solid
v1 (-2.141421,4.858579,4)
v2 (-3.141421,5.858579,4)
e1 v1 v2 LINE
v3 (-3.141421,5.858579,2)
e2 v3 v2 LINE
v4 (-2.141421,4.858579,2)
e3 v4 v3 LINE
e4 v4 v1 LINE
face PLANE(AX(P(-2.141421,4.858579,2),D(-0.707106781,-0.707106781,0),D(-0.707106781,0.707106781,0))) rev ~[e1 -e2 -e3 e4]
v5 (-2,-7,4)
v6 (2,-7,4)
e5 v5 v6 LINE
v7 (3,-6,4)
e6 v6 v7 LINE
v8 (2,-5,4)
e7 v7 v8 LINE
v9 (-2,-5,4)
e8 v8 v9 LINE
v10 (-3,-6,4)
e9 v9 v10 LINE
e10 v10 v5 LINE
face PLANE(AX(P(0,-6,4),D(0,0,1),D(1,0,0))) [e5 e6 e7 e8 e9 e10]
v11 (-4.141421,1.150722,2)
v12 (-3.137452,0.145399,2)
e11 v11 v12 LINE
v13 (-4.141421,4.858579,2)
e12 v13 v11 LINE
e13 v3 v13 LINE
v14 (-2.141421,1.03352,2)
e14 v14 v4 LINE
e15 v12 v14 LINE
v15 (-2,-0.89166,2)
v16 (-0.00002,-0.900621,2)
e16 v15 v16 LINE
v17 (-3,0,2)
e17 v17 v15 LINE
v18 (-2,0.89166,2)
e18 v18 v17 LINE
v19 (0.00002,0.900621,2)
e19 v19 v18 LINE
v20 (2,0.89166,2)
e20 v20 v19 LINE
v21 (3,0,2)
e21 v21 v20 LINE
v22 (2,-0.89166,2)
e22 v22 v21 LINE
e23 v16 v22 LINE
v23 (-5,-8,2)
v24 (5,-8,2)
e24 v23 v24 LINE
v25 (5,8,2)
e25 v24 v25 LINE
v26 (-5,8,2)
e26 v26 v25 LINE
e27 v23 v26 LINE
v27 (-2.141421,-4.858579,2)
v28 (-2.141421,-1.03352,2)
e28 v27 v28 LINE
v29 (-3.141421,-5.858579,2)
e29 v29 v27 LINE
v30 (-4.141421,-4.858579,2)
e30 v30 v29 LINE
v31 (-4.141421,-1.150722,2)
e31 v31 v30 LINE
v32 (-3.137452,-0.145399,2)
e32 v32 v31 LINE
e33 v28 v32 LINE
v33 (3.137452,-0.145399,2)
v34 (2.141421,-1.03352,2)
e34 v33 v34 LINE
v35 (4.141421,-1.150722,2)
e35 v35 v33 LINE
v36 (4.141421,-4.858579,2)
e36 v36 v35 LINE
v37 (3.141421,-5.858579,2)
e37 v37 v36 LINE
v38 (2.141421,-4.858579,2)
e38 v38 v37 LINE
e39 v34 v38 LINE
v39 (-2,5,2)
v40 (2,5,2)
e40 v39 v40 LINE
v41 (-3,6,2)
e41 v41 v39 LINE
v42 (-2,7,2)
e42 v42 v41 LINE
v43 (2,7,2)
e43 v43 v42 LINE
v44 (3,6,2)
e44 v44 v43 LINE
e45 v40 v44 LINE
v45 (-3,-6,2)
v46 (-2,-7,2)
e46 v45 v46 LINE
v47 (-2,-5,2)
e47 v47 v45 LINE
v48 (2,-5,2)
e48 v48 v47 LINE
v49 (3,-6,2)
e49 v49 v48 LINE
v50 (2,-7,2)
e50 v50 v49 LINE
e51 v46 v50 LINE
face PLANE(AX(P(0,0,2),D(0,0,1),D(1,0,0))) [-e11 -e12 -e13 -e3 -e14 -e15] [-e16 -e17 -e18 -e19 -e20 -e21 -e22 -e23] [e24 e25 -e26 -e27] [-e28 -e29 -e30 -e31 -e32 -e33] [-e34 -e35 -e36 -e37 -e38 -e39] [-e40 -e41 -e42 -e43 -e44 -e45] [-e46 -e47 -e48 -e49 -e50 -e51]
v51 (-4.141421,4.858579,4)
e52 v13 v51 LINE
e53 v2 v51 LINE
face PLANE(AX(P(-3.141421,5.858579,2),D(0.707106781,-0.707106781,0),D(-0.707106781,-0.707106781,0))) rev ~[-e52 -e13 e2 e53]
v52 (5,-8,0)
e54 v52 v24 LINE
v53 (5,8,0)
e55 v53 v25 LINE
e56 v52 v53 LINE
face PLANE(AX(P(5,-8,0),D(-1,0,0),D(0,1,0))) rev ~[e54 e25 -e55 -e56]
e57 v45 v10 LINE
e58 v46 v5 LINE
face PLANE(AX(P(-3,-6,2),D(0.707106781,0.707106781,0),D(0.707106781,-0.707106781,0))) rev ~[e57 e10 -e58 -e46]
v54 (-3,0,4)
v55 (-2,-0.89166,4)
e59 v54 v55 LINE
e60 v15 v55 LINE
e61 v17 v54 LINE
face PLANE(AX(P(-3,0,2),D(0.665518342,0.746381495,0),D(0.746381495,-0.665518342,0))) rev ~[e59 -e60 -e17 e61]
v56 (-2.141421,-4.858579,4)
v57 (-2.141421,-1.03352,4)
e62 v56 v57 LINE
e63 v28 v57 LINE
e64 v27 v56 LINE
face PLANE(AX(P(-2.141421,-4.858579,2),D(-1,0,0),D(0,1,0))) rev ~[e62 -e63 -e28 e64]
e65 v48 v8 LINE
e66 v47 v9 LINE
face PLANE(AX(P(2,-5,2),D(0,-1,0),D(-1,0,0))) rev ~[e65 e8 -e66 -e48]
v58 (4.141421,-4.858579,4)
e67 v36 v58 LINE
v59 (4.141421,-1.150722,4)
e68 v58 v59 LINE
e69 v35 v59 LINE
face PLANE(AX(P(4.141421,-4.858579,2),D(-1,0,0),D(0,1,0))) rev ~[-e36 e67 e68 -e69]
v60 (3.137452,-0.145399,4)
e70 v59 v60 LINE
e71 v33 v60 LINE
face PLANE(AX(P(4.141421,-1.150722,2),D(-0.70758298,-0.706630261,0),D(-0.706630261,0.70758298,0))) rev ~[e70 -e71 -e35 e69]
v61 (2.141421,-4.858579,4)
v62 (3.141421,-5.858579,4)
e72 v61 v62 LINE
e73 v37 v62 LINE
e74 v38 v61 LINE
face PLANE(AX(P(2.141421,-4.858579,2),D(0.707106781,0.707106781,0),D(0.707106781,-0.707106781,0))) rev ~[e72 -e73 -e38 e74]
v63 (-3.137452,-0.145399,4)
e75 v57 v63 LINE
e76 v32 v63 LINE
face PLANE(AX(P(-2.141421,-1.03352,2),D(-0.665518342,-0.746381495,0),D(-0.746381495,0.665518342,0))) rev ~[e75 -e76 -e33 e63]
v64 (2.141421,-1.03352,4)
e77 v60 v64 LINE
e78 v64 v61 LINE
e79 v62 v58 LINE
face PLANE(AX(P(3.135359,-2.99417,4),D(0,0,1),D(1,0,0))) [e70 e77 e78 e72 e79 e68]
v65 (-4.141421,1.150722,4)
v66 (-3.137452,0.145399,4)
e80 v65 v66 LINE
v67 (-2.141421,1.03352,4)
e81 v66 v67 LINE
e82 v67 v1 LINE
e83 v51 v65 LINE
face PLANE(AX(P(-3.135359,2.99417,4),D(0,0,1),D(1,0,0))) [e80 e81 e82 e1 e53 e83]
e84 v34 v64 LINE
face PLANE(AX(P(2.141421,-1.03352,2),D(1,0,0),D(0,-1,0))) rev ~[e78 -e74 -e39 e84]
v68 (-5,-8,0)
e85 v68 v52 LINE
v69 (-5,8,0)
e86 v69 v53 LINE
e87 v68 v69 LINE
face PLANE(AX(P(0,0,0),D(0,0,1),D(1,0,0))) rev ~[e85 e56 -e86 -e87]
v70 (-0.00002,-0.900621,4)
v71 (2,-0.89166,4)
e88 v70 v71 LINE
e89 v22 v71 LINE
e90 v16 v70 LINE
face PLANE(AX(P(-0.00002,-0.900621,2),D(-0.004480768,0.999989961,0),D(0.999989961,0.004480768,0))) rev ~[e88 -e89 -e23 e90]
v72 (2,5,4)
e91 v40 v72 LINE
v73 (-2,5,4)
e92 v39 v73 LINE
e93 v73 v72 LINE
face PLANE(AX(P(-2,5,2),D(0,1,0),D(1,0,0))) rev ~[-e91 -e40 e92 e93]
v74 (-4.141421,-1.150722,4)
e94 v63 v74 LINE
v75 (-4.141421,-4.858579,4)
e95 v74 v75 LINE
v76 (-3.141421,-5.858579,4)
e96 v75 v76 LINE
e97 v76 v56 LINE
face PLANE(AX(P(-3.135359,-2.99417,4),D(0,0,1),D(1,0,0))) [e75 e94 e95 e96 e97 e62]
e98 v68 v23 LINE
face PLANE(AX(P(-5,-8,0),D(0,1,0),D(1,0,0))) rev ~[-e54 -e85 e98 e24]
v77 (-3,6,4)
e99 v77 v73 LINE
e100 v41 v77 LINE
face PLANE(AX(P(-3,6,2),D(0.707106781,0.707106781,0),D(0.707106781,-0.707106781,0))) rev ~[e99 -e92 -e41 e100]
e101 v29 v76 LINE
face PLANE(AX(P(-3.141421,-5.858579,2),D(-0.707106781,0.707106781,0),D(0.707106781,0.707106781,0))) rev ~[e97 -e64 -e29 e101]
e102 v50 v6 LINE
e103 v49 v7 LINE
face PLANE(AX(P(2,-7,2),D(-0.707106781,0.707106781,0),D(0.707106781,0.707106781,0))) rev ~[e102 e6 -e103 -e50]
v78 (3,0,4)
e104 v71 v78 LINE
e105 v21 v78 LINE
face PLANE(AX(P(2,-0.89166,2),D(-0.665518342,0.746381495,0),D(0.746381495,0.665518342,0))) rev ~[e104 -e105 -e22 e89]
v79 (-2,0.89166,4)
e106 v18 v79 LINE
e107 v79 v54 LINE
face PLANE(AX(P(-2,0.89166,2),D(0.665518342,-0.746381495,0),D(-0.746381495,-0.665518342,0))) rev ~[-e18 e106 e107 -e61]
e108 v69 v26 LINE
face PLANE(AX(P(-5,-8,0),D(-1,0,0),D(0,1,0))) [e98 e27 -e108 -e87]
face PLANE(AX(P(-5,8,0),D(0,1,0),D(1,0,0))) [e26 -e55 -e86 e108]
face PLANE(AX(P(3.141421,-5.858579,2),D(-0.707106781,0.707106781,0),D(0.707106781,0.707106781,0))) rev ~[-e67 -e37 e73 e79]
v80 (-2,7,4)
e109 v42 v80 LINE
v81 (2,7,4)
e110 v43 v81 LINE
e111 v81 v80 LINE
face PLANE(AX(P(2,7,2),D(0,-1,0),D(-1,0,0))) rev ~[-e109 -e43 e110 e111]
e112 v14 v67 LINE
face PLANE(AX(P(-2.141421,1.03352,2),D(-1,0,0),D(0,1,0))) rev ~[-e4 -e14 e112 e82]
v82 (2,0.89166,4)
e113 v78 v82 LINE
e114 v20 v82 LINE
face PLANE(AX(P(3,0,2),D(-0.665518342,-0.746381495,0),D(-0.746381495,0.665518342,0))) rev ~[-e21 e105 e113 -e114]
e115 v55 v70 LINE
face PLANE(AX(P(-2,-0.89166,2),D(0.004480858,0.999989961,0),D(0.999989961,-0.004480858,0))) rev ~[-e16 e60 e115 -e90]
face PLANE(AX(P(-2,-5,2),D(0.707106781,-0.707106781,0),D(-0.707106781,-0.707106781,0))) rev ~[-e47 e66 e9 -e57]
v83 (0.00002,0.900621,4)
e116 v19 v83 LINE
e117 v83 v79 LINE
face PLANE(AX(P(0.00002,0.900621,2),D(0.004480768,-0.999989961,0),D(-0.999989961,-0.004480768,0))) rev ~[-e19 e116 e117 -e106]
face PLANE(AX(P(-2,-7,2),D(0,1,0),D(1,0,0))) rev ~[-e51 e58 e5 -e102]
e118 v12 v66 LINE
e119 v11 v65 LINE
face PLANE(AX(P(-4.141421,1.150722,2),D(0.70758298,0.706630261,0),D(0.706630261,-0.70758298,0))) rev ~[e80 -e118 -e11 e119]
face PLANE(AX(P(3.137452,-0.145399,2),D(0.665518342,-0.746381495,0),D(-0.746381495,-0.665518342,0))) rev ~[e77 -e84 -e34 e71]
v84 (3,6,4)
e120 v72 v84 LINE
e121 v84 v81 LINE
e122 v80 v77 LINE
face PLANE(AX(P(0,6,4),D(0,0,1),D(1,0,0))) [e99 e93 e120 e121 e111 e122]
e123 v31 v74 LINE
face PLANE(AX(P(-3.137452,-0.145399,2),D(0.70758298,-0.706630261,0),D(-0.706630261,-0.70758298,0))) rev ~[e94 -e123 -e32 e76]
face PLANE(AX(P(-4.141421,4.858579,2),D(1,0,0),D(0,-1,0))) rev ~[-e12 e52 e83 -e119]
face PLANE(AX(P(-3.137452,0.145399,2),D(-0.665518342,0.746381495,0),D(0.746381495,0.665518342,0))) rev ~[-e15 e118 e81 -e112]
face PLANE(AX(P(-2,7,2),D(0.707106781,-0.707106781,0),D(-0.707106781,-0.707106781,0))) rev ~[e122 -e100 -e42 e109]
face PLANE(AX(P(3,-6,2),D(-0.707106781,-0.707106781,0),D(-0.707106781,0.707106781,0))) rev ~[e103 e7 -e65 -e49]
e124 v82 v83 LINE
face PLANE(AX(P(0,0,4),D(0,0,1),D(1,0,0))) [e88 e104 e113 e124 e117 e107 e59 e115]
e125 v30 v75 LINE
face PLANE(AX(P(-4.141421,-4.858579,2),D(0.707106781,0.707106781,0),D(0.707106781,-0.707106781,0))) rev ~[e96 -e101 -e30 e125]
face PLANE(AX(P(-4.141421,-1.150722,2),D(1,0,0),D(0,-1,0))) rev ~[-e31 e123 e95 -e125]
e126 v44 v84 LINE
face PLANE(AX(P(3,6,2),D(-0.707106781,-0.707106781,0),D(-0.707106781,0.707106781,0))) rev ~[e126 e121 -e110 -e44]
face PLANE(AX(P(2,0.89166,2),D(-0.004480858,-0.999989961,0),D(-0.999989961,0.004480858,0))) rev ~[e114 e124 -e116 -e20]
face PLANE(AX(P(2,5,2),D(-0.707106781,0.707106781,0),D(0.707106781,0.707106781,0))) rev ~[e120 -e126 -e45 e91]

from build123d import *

# Parameters (mm, degrees)
F0_W     = 10
F0_H     = 16
F1_DEPTH = 2
F3_DEPTH = 2


# Not quite as in the source:
# - ends of sketch curves that miss each other by under 0.0002 mm in the source are joined
# - a feature names something its author has since deleted; it is built from what else it names


with BuildPart() as f1:
    # F0 (on Top) → F1 (new body)
    with BuildSketch(Plane.XY):
        Rectangle(F0_W, F0_H)
    extrude(amount=F1_DEPTH)

    # F2 (on face) → F3 (join)
    with BuildSketch(Plane.XY.offset(2)):
        Polygon((0, 7), (-2, 7), (-3, 6), (-2, 5), (0, 5), (2, 5), (3, 6), (2, 7), align=None)
        Polygon((-2.1414213562, 4.8585786438), (-3.1414213562, 5.8585786438), (-4.1414213562, 4.8585786438), (-4.1414213562, 1.1507223826), (-3.1374518146, 0.1453992321), (-2.1414213562, 1.0335195075), align=None)
        Polygon((2, 0.891659756), (2.00782e-05, 0.9006214721), (-2, 0.891659756), (-3, 0), (-2, -0.891659756), (-2.00782e-05, -0.9006214721), (2, -0.891659756), (3, 0), align=None)
        Polygon((3.1374518146, -0.1453992321), (2.1414213562, -1.0335195075), (2.1414213562, -4.8585786438), (3.1414213562, -5.8585786438), (4.1414213562, -4.8585786438), (4.1414213562, -1.1507223826), align=None)
        Polygon((0, -5), (-2, -5), (-3, -6), (-2, -7), (0, -7), (2, -7), (3, -6), (2, -5), align=None)
        Polygon((-4.1414213562, -4.8585786438), (-3.1414213562, -5.8585786438), (-2.1414213562, -4.8585786438), (-2.1414213562, -1.0335195075), (-3.1374518146, -0.1453992321), (-4.1414213562, -1.1507223826), align=None)
    extrude(amount=F3_DEPTH)


solid = f1.part
